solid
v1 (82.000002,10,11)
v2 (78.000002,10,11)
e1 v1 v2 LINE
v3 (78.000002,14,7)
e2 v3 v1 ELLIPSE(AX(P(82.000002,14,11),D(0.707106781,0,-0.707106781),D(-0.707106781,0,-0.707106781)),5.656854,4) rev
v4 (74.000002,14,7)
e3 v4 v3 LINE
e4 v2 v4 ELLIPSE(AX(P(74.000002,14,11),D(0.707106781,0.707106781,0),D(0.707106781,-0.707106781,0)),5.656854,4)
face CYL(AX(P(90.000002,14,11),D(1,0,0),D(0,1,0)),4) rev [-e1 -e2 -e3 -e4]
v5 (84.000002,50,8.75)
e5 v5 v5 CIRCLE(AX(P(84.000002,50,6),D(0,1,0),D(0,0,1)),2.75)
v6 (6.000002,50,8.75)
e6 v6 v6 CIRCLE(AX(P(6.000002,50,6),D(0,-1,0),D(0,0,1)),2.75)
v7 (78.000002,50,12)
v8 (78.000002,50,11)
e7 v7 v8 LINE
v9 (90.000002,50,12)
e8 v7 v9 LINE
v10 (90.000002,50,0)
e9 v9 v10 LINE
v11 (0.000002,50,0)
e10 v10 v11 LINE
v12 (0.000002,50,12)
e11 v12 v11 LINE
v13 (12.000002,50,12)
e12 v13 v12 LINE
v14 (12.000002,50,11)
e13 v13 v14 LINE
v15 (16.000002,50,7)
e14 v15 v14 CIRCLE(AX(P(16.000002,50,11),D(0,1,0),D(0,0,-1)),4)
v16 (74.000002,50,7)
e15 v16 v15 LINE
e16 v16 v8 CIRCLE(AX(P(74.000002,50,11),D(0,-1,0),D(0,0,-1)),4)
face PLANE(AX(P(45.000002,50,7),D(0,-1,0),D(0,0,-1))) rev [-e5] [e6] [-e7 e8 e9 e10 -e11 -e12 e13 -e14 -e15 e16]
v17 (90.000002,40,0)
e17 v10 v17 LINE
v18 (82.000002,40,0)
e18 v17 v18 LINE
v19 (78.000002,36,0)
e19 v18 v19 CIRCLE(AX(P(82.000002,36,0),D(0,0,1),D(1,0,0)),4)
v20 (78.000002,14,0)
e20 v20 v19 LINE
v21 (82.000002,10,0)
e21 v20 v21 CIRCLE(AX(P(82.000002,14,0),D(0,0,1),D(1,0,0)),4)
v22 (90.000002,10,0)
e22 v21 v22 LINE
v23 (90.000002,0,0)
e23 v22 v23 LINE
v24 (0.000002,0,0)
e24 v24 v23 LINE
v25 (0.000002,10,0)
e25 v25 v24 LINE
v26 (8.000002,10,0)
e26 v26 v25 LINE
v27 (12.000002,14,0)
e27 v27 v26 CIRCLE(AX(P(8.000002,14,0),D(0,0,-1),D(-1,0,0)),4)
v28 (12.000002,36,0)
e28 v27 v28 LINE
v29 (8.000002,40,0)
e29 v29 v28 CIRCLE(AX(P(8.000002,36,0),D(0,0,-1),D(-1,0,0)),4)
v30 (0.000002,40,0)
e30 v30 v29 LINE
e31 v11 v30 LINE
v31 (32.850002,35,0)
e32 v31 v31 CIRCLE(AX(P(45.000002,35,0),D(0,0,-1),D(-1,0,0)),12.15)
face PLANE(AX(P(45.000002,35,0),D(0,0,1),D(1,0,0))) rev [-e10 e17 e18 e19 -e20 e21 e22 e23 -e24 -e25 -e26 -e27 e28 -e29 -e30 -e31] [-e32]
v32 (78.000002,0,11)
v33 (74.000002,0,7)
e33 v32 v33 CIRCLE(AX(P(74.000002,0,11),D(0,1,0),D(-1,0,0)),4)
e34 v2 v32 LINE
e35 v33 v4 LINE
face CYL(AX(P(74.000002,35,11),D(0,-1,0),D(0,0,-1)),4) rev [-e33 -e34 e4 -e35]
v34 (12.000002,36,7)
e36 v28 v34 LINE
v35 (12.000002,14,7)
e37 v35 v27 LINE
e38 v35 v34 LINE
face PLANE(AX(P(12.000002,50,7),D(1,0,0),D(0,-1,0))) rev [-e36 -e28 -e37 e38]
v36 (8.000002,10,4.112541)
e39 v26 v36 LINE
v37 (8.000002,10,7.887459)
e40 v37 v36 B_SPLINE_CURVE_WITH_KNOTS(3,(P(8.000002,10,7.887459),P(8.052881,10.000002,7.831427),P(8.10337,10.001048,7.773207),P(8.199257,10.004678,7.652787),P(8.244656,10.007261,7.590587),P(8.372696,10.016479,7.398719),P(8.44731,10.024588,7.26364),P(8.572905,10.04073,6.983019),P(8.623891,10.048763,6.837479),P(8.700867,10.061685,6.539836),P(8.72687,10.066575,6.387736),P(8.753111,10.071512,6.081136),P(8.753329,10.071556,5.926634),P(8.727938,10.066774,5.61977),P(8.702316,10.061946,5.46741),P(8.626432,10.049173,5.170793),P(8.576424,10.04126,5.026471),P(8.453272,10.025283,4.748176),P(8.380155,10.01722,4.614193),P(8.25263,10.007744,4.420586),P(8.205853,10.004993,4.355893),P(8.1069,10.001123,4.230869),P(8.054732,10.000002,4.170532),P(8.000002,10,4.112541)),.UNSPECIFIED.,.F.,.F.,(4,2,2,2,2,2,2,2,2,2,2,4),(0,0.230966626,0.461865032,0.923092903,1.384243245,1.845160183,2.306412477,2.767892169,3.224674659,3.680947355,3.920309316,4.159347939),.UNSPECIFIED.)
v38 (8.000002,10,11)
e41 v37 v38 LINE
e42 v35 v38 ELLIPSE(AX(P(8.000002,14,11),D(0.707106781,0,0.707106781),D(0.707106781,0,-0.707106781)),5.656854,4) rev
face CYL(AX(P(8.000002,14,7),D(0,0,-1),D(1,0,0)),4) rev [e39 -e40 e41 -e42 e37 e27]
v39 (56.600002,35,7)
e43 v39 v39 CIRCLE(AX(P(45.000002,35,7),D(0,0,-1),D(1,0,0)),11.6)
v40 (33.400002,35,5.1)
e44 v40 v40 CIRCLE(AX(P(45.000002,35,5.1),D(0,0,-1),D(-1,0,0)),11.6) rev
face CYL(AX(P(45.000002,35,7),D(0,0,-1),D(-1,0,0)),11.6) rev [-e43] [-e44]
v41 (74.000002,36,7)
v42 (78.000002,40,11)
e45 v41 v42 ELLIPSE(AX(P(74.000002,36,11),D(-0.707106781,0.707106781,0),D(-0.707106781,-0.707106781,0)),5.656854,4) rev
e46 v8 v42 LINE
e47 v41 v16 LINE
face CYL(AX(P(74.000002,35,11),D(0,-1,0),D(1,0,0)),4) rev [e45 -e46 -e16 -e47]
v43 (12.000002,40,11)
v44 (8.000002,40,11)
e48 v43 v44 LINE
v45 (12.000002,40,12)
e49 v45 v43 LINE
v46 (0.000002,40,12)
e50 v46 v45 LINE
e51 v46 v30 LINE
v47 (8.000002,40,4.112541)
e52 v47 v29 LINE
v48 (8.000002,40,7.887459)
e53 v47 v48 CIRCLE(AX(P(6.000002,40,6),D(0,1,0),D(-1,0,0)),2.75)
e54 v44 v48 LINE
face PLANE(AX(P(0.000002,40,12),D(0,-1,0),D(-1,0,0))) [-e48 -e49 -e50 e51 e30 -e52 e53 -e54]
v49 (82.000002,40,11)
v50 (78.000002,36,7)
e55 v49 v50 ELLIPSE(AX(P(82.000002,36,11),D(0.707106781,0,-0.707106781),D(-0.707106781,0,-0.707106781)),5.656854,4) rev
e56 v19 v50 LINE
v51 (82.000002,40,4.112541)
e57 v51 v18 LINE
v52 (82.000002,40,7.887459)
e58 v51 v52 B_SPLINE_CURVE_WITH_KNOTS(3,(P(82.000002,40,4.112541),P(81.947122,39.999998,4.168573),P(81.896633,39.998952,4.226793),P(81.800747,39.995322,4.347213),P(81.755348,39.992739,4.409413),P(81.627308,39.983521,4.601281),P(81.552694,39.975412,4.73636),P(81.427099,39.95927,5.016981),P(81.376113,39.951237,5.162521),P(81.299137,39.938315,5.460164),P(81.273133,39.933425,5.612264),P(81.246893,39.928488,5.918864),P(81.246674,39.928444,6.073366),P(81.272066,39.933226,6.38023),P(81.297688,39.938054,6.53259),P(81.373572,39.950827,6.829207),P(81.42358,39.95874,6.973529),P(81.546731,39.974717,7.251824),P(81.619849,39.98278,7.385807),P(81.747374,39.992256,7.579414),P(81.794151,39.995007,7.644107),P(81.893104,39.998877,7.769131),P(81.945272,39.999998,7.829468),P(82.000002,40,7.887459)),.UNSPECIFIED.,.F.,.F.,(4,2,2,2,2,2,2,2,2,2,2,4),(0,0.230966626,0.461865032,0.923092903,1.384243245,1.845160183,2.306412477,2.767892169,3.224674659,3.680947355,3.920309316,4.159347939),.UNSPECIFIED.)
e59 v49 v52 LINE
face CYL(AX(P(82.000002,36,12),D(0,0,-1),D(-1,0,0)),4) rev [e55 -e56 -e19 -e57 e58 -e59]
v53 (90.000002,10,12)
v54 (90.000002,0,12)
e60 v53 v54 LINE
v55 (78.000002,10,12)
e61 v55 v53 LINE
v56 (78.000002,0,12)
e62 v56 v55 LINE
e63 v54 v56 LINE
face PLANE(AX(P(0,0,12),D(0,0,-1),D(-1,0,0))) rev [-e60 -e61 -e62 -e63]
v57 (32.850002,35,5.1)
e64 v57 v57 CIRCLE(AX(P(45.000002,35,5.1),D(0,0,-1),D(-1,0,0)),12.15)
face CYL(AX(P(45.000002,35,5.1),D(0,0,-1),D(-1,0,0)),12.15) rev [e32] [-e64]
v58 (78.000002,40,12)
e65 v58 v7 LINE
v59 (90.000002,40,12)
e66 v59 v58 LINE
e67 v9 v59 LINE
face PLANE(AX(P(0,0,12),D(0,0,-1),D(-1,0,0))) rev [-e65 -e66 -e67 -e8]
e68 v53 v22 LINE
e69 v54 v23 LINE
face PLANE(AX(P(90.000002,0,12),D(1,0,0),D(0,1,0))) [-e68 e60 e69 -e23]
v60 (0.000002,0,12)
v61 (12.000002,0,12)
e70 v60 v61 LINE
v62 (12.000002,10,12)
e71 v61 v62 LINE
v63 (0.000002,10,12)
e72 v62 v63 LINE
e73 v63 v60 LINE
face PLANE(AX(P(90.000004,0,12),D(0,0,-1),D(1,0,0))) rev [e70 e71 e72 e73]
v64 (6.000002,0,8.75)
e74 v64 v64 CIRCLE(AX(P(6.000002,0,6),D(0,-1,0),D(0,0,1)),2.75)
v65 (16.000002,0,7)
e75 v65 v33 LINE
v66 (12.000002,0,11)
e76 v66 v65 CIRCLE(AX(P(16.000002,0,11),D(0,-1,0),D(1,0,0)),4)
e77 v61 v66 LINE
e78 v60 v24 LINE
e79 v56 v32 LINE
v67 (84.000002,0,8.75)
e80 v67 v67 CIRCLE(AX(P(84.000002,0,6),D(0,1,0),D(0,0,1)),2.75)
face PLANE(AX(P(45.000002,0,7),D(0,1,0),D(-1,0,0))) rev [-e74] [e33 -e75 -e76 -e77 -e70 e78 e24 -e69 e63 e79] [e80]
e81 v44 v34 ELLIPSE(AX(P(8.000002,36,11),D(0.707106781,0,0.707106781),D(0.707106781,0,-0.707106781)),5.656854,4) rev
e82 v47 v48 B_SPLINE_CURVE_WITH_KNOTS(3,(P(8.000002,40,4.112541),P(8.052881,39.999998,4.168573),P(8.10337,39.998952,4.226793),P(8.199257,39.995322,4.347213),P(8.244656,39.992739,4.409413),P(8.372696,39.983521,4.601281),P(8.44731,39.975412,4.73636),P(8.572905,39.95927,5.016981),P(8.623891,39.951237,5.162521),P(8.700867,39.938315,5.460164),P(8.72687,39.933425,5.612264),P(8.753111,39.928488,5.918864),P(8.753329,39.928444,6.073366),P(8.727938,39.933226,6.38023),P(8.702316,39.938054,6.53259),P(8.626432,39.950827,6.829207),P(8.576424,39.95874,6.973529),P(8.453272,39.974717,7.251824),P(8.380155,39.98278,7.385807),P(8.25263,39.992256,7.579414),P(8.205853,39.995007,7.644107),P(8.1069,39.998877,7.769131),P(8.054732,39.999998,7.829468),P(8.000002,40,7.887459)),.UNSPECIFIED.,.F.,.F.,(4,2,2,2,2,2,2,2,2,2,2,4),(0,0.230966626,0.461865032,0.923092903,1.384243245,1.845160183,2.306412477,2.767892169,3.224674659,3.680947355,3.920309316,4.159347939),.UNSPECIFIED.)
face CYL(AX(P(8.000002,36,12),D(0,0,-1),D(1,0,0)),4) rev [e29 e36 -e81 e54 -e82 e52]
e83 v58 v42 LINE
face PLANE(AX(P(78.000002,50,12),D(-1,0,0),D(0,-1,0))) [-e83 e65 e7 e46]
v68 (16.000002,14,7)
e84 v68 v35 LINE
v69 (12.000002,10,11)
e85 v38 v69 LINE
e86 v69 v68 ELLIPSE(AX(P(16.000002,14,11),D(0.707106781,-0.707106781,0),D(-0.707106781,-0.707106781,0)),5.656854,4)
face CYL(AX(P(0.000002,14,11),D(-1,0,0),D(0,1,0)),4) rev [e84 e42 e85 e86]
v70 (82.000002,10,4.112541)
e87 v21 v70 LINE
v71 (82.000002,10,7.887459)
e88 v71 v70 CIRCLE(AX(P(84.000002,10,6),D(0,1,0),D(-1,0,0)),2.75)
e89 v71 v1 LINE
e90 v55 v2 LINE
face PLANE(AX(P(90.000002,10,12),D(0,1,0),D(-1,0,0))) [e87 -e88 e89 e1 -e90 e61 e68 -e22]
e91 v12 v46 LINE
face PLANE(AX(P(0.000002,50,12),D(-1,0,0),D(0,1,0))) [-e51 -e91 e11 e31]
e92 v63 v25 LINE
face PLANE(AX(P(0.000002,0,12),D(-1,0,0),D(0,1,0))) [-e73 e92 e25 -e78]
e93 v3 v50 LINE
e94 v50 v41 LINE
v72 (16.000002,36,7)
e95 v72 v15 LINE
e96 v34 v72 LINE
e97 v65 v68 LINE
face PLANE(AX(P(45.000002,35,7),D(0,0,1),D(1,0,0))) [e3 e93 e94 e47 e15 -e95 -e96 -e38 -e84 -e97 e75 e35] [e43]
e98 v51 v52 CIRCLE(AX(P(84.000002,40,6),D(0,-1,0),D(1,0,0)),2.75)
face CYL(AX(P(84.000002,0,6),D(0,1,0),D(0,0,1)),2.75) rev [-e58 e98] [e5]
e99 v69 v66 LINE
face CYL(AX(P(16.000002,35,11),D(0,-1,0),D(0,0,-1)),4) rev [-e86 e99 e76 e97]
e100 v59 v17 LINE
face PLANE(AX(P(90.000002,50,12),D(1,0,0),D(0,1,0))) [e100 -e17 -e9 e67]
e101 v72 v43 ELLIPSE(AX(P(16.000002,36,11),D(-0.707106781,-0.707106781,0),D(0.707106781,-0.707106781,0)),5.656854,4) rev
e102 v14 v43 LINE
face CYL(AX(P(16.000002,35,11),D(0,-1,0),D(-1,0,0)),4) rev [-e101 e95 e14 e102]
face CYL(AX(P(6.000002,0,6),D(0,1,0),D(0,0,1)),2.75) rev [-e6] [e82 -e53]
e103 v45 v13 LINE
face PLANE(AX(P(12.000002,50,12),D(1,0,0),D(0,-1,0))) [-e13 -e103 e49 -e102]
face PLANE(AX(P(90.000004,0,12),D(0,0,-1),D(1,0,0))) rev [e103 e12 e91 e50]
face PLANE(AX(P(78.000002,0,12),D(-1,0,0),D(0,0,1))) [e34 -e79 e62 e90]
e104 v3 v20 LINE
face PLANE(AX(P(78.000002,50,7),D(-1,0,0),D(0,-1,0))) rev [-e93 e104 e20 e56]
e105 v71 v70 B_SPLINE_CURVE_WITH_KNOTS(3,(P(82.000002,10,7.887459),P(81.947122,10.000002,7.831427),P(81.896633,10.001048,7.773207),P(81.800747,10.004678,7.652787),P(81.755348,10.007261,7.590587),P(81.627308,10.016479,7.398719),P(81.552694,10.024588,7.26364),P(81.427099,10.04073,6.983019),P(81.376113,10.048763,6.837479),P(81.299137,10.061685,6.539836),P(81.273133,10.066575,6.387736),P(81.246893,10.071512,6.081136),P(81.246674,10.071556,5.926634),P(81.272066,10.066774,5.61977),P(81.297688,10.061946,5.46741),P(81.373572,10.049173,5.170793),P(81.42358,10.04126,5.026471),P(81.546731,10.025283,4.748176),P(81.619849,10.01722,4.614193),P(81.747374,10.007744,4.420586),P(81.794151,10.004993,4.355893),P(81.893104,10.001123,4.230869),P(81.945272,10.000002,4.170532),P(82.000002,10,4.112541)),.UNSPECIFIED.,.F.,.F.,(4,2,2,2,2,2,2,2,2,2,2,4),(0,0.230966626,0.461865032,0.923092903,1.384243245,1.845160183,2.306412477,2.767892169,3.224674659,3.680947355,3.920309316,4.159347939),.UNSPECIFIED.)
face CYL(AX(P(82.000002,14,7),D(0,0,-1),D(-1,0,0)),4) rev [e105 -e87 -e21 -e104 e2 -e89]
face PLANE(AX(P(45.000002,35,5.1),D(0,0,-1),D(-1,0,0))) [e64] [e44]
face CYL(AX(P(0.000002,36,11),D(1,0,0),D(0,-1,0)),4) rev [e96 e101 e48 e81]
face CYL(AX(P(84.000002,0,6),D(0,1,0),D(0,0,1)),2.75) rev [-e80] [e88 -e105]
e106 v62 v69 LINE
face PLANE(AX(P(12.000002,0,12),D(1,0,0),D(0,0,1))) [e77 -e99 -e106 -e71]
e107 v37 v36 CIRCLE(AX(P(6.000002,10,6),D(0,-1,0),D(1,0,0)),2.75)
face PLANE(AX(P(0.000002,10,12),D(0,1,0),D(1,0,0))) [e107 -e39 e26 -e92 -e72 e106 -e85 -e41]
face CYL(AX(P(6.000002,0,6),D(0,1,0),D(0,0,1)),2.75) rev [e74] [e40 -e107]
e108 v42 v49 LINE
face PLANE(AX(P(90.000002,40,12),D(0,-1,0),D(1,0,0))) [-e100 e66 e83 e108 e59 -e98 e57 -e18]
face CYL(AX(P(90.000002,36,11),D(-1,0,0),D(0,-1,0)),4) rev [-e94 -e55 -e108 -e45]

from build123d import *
from build123d.topology import SkipClean

# Parameters (mm, degrees)
BOSS_EXTRUDE1_DEPTH = 7
SKETCH2_W           = 12
SKETCH2_H           = 10
BOSS_EXTRUDE2_DEPTH = 12
FILLET1_R           = 4
FILLET2_R           = 4
SKETCH3_R           = 2.75
CUT_EXTRUDE1_DEPTH  = 104.653269711
SKETCH4_R           = 12.15
CUT_EXTRUDE2_DEPTH  = 5.1


with BuildPart() as part:
    # Sketch1 → Boss-Extrude1 (new body)
    with BuildSketch(Plane.XY):
        with BuildLine():
            Line((45.000001788, 50), (78.000001788, 50))
            Line((78.000001788, 50), (78.000001788, 0))
            Line((78.000001788, 0), (45.000001788, 0))
            Line((45.000001788, 0), (45.000001788, 23.4))
            ThreePointArc((45.000001788, 23.4), (56.600001788, 35), (45.000001788, 46.6))
            Line((45.000001788, 46.6), (45.000001788, 50))
        make_face()
    extrude(amount=BOSS_EXTRUDE1_DEPTH)

    # Sketch2 → Boss-Extrude2 (add)
    with BuildSketch(Plane(origin=(0, 0, 0), x_dir=(-1, 0, 0), z_dir=(0, 0, -1))):
        with Locations((-84.000001788, 45)):
            Rectangle(SKETCH2_W, SKETCH2_H)
        with Locations((-84.000001788, 5)):
            Rectangle(SKETCH2_W, SKETCH2_H)
    extrude(amount=-BOSS_EXTRUDE2_DEPTH)

    # Fillet1
    fillet1_edges = [part.edges().sort_by_distance(p)[0] for p in [
        (78.000001788, 40, 3.5),
        (78.000001788, 10, 3.5),
    ]]
    fillet(fillet1_edges, radius=FILLET1_R)

    # Fillet2
    fillet2_edges = [part.edges().sort_by_distance(p)[0] for p in [
        (78.000001788, 5, 7),
        (80.000001788, 10, 7),
        (78.000001788, 45, 7),
        (80.000001788, 40, 7),
    ]]
    fillet(fillet2_edges, radius=FILLET2_R - 0.0001)  # a hair under: the kernel refuses the full size

    # Sketch3 → Cut-Extrude1 (cut, through all)
    with BuildSketch(Plane(origin=(0, 50, 0), x_dir=(1, 0, 0), z_dir=(0, 1, 0))):
        with Locations(Location((84.000001788, -6, 0), (0, 0, 270))):
            Circle(SKETCH3_R)
    extrude(amount=-CUT_EXTRUDE1_DEPTH, mode=Mode.SUBTRACT)

    # Sketch4 → Cut-Extrude2 (cut)
    with BuildSketch(Plane(origin=(0, 0, 0), x_dir=(-1, 0, 0), z_dir=(0, 0, -1))):
        with Locations((-45.000001788, 35)):
            Circle(SKETCH4_R)
    extrude(amount=-CUT_EXTRUDE2_DEPTH, mode=Mode.SUBTRACT)

    # Mirror1: part across plane


with BuildPart() as part_1:
    with SkipClean():  # the faces are left unmerged after this step: merging them gives an invalid solid
        add(part.part)
        add(part.part.mirror(Plane(origin=(45.000001788, 23.4, 7), x_dir=(0, 0, 1), z_dir=(1, 0, 0))))


solid = part_1.part
